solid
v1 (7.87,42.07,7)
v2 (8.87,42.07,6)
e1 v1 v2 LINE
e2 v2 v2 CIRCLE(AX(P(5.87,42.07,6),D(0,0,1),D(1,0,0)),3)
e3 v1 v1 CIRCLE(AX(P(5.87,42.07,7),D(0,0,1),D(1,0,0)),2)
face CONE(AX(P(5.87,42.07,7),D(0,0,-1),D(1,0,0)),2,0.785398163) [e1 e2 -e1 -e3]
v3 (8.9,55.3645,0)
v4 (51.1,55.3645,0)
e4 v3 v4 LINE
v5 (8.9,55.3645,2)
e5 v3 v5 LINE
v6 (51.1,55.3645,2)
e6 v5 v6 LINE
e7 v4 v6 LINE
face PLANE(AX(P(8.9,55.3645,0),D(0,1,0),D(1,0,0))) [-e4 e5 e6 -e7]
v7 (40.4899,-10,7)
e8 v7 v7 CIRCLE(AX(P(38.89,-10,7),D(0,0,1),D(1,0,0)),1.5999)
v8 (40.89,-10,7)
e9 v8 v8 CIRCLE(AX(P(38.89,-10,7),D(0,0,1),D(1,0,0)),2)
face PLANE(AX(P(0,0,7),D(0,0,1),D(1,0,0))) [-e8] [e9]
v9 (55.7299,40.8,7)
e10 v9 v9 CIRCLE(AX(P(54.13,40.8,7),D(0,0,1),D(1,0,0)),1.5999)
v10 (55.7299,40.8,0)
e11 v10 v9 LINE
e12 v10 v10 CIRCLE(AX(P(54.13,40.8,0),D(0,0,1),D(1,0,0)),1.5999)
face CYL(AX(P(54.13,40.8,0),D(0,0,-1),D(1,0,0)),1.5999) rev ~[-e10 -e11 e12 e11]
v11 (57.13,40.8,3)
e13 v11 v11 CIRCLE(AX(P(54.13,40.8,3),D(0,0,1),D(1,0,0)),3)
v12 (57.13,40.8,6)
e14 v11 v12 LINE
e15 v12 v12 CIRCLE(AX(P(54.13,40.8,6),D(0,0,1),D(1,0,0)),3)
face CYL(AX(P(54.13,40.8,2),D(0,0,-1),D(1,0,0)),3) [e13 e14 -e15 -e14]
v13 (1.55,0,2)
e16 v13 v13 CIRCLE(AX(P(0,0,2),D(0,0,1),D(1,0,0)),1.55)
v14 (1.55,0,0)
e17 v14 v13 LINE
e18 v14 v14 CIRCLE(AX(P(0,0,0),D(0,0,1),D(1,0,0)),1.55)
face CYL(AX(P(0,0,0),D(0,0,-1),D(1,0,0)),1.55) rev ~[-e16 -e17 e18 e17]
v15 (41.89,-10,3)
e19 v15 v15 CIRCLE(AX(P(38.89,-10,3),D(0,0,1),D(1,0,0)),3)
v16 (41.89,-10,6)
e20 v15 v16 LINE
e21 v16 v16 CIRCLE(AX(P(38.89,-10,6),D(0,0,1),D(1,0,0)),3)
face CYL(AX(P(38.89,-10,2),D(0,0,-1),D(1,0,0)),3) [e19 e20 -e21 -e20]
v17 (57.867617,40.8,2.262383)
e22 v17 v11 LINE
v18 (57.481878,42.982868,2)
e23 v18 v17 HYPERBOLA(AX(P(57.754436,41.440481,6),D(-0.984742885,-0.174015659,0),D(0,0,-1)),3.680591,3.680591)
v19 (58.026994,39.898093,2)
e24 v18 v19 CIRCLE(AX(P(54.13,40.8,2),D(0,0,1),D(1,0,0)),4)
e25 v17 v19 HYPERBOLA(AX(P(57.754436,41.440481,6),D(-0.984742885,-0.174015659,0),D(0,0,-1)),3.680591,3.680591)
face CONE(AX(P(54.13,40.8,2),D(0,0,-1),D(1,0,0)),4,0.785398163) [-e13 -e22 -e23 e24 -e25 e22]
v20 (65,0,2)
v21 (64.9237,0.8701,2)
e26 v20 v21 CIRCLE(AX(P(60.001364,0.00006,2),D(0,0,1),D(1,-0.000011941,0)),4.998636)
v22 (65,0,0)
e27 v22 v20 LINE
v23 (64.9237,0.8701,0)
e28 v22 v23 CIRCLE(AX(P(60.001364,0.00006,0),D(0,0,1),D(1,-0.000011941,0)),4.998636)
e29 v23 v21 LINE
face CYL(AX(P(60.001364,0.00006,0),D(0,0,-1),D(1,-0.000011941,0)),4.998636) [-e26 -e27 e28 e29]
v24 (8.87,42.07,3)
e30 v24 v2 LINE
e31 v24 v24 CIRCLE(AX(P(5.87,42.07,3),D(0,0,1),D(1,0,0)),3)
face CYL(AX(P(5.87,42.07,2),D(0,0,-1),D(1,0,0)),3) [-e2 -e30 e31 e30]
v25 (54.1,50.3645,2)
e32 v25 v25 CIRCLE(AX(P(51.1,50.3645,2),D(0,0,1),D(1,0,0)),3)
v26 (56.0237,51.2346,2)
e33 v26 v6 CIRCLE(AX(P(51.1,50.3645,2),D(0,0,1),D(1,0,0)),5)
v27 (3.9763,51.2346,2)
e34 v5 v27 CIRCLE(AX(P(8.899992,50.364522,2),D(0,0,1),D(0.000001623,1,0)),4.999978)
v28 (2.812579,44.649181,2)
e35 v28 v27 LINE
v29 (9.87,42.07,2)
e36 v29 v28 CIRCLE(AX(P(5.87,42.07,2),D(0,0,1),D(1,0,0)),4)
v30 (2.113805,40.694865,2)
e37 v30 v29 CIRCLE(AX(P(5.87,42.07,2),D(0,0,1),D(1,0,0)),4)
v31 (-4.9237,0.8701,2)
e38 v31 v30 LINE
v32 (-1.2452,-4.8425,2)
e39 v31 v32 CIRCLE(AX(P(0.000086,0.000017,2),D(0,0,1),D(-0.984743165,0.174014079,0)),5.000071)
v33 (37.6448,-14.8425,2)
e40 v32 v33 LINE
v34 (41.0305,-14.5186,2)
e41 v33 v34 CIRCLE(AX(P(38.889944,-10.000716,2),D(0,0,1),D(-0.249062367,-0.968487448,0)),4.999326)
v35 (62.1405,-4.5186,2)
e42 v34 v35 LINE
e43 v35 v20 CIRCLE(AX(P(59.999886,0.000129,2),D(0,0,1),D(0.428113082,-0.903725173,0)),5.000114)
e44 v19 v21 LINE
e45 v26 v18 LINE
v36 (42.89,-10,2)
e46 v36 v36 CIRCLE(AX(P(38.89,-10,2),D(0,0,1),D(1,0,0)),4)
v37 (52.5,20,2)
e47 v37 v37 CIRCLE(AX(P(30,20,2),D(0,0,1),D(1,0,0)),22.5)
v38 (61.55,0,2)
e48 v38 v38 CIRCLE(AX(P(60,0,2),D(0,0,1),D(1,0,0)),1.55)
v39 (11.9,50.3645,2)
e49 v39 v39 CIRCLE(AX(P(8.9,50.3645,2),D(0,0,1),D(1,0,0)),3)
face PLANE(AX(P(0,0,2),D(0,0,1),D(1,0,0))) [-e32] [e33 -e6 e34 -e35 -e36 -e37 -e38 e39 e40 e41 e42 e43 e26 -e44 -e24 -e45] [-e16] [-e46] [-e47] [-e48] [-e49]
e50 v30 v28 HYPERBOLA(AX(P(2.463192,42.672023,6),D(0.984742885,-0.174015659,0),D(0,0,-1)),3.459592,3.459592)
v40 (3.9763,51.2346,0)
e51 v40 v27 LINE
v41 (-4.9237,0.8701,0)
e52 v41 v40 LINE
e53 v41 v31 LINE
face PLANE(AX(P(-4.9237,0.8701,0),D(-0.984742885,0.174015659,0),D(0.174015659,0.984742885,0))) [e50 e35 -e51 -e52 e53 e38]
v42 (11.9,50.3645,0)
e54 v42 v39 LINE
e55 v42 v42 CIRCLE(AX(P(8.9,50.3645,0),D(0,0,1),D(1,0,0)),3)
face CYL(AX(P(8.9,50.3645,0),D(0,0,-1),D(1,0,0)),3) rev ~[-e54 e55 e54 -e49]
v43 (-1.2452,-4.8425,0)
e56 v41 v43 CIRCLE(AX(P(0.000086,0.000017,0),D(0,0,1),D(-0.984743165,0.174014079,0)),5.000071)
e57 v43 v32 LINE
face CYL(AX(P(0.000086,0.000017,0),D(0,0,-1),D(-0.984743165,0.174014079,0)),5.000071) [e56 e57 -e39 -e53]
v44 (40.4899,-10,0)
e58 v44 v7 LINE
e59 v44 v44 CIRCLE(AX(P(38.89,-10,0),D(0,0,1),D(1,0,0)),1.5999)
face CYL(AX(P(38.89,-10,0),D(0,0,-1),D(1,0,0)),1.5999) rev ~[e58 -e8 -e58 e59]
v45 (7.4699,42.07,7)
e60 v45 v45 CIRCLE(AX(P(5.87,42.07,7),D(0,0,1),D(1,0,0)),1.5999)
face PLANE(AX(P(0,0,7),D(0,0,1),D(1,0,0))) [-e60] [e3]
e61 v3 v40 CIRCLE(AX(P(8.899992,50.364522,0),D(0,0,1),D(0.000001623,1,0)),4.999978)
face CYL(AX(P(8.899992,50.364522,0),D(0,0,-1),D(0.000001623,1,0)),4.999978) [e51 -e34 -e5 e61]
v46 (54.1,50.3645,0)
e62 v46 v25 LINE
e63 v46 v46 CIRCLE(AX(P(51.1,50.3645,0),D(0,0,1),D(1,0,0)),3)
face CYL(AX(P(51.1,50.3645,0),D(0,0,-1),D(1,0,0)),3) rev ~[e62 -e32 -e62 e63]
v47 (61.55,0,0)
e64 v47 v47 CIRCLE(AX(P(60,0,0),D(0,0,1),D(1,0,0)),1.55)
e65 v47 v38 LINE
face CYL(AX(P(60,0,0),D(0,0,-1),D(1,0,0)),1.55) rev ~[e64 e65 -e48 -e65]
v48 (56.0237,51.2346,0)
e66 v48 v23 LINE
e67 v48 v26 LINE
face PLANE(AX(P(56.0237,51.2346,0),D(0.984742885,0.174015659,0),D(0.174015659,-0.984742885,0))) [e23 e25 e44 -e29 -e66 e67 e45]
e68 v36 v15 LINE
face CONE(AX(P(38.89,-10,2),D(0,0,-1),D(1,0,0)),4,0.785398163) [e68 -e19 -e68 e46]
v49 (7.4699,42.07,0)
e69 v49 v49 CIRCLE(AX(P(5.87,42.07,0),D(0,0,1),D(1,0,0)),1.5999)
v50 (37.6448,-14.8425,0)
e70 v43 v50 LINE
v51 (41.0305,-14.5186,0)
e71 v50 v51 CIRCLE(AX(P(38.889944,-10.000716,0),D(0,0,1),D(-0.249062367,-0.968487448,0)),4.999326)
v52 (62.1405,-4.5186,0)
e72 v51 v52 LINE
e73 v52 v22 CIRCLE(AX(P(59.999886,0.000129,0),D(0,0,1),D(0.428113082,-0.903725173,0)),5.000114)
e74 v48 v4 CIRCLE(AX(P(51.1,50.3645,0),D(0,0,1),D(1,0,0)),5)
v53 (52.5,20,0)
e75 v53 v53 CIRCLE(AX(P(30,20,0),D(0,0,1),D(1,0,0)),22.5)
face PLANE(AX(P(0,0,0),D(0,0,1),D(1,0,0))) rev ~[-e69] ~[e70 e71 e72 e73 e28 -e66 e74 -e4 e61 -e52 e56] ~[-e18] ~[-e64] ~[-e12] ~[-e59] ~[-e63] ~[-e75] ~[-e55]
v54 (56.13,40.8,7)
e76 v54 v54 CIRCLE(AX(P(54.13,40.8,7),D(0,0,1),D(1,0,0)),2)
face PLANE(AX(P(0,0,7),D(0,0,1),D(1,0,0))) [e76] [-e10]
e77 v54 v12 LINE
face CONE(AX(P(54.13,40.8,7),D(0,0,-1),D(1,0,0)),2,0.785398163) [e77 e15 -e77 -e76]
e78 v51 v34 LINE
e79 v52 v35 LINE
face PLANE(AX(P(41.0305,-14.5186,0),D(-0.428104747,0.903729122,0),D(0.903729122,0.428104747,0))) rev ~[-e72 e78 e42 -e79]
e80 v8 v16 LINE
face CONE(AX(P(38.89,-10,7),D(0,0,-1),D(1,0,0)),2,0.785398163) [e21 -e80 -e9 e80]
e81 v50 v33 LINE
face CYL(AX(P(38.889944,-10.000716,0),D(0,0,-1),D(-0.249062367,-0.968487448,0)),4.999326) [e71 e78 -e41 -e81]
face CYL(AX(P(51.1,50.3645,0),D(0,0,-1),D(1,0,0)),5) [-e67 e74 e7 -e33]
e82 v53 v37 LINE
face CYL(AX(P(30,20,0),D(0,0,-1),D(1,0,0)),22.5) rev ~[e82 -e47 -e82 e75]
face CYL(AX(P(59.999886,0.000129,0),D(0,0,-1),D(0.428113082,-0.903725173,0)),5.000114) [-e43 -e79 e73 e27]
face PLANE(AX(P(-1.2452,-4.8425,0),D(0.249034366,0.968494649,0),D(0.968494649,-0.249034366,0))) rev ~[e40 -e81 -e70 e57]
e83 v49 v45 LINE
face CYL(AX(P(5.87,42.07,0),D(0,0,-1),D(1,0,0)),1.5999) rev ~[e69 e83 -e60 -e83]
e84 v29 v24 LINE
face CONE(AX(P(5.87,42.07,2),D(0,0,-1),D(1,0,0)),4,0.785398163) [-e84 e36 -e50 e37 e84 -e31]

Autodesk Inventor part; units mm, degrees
ref_plane "YZ Plane" through (0, 0, 0) normal (1, 0, 0) x (0, 1, 0)
ref_plane "XZ Plane" through (0, 0, 0) normal (0, 1, 0) x (-1, 0, 0)
ref_plane "XY Plane" through (0, 0, 0) normal (0, 0, 1) x (1, 0, 0)
sketch "Sketch1" plane through (0, 0, 0) normal (0, 0, 1) x (1, 0, 0)
  circle A0 centre (8.9, 50.3645) radius 1.55 construction
  circle A1 centre (8.9, 50.3645) radius 3
  circle A2 centre (51.1, 50.3645) radius 1.55 construction
  circle A3 centre (51.1, 50.3645) radius 3
  circle A4 centre (60, 0) radius 1.55
  circle A5 centre (60, 0) radius 1.55
  circle A6 centre (0, 0) radius 1.55
  circle A7 centre (0, 0) radius 1.55
  circle A8 centre (54.13, 40.8) radius 1.5999
  circle A9 centre (5.87, 42.07) radius 1.5999
  circle A10 centre (38.89, -10) radius 1.5999
  circle A11 centre (54.13, 40.8) radius 1.55 construction
  circle A12 centre (5.87, 42.07) radius 1.55 construction
  circle A13 centre (38.89, -10) radius 1.55 construction
  line L0 (8.9, 55.3645) -> (3.9, 55.3645) construction
  circle A14 centre (30, 20) radius 22.5
  arc A15 (38.89, -5) -> (37.7654, -14.8719) centre (38.89, -10) ccw construction
  arc A16 (37.6448, -14.8425) -> (41.0305, -14.5186) centre (38.89, -10) ccw
  line L1 (8.9, 55.3645) -> (8.9, 50.3645) construction
  line L2 (51.1, 55.3645) -> (51.1, 50.3645) construction
  arc A17 (-1.2452, -4.8425) -> (-5, 0) centre (0, 0) ccw construction
  arc A18 (65, 0) -> (64.9237, 0.8701) centre (60, 0) ccw
  line L3 (-1.2452, -4.8425) -> (37.6448, -14.8425)
  line L4 (41.0305, -14.5186) -> (62.1405, -4.5186)
  arc A19 (-4.9237, 0.8701) -> (-1.2452, -4.8425) centre (0, 0) ccw
  arc A20 (62.1405, -4.5186) -> (65, 0) centre (60, 0) ccw
  arc A21 (3.9763, 51.2346) -> (8.9, 55.3645) centre (8.9, 50.3645) ccw construction
  line L5 (-4.9237, 0.8701) -> (3.9763, 51.2346)
  line L6 (56.0237, 51.2346) -> (64.9237, 0.8701)
  arc A22 (64.9237, 0.8701) -> (62.1405, -4.5186) centre (60, 0) ccw construction
  arc A23 (41.0305, -14.5186) -> (38.89, -5) centre (38.89, -10) ccw construction
  line L7 (8.9, 55.3645) -> (51.1, 55.3645)
  arc A24 (8.9, 55.3645) -> (3.9763, 51.2346) centre (8.9, 50.3645) ccw
  circle A25 centre (51.1, 50.3645) radius 5
  point P0 (17, 90.5)
  dimension "d0" = 6
  dimension "d1" = 6
  dimension "d2" = 3.1
  dimension "d3" = 3.1
  dimension "d4" = 8.9
  dimension "d5" = 8.9
  dimension "d6" = 42.2
  dimension "d7" = 50.3645
  dimension "d8" = 0
  dimension "d9" = 0
  dimension "d10" = 3.1
  dimension "d11" = 3.1
  dimension "d12" = 3.1
  dimension "d13" = 52.07
  dimension "d14" = 50.8
  dimension "d15" = 33.02
  dimension "d16" = 15.24
  dimension "d19" = 5.87
  dimension "d51" = 5
  dimension "d52" = 45
  dimension "d55" = 10
  dimension "d56" = 10
  dimension "d65" = 20
  dimension "d66" = 21.1
  dimension "d67" = 10
  dimension "d68" = 10
  dimension "d69" = 10
  dimension "d71" = 10
extrude "Extrusion1" add sketch "Sketch1" along normal blind 2
sketch "Sketch5" plane through (0, 0, 2) normal (0, 0, 1) x (1, 0, 0)
  circle A0 centre (5.87, 42.07) radius 1.5999 projected
  circle A1 centre (5.87, 42.07) radius 3
  circle A2 centre (54.13, 40.8) radius 1.5999 projected
  circle A3 centre (54.13, 40.8) radius 3
  circle A4 centre (38.89, -10) radius 1.5999 projected
  circle A5 centre (38.89, -10) radius 3
  point P0 (0, 0)
  dimension "d57" = 6
  dimension "d58" = 6
  dimension "d59" = 6
extrude "Extrusion5" add sketch "Sketch5" along normal blind 5
chamfer "Chamfer3" distance 1 angle 45 6 edges at (2.87, 42.07, 2) (2.87, 42.07, 7) (51.13, 40.8, 2) (51.13, 40.8, 7) (35.89, -10, 2) (35.89, -10, 7)
equation "\"d19\" = -0.5 * d16 - 0.5 * d15 + 0.5 * d6 + 0.5 * d5 + 0.5 * d4"
equation "\"d66\" = 0.5 * d6"
properties part number "SimpleRTK - PlateAdapter"
